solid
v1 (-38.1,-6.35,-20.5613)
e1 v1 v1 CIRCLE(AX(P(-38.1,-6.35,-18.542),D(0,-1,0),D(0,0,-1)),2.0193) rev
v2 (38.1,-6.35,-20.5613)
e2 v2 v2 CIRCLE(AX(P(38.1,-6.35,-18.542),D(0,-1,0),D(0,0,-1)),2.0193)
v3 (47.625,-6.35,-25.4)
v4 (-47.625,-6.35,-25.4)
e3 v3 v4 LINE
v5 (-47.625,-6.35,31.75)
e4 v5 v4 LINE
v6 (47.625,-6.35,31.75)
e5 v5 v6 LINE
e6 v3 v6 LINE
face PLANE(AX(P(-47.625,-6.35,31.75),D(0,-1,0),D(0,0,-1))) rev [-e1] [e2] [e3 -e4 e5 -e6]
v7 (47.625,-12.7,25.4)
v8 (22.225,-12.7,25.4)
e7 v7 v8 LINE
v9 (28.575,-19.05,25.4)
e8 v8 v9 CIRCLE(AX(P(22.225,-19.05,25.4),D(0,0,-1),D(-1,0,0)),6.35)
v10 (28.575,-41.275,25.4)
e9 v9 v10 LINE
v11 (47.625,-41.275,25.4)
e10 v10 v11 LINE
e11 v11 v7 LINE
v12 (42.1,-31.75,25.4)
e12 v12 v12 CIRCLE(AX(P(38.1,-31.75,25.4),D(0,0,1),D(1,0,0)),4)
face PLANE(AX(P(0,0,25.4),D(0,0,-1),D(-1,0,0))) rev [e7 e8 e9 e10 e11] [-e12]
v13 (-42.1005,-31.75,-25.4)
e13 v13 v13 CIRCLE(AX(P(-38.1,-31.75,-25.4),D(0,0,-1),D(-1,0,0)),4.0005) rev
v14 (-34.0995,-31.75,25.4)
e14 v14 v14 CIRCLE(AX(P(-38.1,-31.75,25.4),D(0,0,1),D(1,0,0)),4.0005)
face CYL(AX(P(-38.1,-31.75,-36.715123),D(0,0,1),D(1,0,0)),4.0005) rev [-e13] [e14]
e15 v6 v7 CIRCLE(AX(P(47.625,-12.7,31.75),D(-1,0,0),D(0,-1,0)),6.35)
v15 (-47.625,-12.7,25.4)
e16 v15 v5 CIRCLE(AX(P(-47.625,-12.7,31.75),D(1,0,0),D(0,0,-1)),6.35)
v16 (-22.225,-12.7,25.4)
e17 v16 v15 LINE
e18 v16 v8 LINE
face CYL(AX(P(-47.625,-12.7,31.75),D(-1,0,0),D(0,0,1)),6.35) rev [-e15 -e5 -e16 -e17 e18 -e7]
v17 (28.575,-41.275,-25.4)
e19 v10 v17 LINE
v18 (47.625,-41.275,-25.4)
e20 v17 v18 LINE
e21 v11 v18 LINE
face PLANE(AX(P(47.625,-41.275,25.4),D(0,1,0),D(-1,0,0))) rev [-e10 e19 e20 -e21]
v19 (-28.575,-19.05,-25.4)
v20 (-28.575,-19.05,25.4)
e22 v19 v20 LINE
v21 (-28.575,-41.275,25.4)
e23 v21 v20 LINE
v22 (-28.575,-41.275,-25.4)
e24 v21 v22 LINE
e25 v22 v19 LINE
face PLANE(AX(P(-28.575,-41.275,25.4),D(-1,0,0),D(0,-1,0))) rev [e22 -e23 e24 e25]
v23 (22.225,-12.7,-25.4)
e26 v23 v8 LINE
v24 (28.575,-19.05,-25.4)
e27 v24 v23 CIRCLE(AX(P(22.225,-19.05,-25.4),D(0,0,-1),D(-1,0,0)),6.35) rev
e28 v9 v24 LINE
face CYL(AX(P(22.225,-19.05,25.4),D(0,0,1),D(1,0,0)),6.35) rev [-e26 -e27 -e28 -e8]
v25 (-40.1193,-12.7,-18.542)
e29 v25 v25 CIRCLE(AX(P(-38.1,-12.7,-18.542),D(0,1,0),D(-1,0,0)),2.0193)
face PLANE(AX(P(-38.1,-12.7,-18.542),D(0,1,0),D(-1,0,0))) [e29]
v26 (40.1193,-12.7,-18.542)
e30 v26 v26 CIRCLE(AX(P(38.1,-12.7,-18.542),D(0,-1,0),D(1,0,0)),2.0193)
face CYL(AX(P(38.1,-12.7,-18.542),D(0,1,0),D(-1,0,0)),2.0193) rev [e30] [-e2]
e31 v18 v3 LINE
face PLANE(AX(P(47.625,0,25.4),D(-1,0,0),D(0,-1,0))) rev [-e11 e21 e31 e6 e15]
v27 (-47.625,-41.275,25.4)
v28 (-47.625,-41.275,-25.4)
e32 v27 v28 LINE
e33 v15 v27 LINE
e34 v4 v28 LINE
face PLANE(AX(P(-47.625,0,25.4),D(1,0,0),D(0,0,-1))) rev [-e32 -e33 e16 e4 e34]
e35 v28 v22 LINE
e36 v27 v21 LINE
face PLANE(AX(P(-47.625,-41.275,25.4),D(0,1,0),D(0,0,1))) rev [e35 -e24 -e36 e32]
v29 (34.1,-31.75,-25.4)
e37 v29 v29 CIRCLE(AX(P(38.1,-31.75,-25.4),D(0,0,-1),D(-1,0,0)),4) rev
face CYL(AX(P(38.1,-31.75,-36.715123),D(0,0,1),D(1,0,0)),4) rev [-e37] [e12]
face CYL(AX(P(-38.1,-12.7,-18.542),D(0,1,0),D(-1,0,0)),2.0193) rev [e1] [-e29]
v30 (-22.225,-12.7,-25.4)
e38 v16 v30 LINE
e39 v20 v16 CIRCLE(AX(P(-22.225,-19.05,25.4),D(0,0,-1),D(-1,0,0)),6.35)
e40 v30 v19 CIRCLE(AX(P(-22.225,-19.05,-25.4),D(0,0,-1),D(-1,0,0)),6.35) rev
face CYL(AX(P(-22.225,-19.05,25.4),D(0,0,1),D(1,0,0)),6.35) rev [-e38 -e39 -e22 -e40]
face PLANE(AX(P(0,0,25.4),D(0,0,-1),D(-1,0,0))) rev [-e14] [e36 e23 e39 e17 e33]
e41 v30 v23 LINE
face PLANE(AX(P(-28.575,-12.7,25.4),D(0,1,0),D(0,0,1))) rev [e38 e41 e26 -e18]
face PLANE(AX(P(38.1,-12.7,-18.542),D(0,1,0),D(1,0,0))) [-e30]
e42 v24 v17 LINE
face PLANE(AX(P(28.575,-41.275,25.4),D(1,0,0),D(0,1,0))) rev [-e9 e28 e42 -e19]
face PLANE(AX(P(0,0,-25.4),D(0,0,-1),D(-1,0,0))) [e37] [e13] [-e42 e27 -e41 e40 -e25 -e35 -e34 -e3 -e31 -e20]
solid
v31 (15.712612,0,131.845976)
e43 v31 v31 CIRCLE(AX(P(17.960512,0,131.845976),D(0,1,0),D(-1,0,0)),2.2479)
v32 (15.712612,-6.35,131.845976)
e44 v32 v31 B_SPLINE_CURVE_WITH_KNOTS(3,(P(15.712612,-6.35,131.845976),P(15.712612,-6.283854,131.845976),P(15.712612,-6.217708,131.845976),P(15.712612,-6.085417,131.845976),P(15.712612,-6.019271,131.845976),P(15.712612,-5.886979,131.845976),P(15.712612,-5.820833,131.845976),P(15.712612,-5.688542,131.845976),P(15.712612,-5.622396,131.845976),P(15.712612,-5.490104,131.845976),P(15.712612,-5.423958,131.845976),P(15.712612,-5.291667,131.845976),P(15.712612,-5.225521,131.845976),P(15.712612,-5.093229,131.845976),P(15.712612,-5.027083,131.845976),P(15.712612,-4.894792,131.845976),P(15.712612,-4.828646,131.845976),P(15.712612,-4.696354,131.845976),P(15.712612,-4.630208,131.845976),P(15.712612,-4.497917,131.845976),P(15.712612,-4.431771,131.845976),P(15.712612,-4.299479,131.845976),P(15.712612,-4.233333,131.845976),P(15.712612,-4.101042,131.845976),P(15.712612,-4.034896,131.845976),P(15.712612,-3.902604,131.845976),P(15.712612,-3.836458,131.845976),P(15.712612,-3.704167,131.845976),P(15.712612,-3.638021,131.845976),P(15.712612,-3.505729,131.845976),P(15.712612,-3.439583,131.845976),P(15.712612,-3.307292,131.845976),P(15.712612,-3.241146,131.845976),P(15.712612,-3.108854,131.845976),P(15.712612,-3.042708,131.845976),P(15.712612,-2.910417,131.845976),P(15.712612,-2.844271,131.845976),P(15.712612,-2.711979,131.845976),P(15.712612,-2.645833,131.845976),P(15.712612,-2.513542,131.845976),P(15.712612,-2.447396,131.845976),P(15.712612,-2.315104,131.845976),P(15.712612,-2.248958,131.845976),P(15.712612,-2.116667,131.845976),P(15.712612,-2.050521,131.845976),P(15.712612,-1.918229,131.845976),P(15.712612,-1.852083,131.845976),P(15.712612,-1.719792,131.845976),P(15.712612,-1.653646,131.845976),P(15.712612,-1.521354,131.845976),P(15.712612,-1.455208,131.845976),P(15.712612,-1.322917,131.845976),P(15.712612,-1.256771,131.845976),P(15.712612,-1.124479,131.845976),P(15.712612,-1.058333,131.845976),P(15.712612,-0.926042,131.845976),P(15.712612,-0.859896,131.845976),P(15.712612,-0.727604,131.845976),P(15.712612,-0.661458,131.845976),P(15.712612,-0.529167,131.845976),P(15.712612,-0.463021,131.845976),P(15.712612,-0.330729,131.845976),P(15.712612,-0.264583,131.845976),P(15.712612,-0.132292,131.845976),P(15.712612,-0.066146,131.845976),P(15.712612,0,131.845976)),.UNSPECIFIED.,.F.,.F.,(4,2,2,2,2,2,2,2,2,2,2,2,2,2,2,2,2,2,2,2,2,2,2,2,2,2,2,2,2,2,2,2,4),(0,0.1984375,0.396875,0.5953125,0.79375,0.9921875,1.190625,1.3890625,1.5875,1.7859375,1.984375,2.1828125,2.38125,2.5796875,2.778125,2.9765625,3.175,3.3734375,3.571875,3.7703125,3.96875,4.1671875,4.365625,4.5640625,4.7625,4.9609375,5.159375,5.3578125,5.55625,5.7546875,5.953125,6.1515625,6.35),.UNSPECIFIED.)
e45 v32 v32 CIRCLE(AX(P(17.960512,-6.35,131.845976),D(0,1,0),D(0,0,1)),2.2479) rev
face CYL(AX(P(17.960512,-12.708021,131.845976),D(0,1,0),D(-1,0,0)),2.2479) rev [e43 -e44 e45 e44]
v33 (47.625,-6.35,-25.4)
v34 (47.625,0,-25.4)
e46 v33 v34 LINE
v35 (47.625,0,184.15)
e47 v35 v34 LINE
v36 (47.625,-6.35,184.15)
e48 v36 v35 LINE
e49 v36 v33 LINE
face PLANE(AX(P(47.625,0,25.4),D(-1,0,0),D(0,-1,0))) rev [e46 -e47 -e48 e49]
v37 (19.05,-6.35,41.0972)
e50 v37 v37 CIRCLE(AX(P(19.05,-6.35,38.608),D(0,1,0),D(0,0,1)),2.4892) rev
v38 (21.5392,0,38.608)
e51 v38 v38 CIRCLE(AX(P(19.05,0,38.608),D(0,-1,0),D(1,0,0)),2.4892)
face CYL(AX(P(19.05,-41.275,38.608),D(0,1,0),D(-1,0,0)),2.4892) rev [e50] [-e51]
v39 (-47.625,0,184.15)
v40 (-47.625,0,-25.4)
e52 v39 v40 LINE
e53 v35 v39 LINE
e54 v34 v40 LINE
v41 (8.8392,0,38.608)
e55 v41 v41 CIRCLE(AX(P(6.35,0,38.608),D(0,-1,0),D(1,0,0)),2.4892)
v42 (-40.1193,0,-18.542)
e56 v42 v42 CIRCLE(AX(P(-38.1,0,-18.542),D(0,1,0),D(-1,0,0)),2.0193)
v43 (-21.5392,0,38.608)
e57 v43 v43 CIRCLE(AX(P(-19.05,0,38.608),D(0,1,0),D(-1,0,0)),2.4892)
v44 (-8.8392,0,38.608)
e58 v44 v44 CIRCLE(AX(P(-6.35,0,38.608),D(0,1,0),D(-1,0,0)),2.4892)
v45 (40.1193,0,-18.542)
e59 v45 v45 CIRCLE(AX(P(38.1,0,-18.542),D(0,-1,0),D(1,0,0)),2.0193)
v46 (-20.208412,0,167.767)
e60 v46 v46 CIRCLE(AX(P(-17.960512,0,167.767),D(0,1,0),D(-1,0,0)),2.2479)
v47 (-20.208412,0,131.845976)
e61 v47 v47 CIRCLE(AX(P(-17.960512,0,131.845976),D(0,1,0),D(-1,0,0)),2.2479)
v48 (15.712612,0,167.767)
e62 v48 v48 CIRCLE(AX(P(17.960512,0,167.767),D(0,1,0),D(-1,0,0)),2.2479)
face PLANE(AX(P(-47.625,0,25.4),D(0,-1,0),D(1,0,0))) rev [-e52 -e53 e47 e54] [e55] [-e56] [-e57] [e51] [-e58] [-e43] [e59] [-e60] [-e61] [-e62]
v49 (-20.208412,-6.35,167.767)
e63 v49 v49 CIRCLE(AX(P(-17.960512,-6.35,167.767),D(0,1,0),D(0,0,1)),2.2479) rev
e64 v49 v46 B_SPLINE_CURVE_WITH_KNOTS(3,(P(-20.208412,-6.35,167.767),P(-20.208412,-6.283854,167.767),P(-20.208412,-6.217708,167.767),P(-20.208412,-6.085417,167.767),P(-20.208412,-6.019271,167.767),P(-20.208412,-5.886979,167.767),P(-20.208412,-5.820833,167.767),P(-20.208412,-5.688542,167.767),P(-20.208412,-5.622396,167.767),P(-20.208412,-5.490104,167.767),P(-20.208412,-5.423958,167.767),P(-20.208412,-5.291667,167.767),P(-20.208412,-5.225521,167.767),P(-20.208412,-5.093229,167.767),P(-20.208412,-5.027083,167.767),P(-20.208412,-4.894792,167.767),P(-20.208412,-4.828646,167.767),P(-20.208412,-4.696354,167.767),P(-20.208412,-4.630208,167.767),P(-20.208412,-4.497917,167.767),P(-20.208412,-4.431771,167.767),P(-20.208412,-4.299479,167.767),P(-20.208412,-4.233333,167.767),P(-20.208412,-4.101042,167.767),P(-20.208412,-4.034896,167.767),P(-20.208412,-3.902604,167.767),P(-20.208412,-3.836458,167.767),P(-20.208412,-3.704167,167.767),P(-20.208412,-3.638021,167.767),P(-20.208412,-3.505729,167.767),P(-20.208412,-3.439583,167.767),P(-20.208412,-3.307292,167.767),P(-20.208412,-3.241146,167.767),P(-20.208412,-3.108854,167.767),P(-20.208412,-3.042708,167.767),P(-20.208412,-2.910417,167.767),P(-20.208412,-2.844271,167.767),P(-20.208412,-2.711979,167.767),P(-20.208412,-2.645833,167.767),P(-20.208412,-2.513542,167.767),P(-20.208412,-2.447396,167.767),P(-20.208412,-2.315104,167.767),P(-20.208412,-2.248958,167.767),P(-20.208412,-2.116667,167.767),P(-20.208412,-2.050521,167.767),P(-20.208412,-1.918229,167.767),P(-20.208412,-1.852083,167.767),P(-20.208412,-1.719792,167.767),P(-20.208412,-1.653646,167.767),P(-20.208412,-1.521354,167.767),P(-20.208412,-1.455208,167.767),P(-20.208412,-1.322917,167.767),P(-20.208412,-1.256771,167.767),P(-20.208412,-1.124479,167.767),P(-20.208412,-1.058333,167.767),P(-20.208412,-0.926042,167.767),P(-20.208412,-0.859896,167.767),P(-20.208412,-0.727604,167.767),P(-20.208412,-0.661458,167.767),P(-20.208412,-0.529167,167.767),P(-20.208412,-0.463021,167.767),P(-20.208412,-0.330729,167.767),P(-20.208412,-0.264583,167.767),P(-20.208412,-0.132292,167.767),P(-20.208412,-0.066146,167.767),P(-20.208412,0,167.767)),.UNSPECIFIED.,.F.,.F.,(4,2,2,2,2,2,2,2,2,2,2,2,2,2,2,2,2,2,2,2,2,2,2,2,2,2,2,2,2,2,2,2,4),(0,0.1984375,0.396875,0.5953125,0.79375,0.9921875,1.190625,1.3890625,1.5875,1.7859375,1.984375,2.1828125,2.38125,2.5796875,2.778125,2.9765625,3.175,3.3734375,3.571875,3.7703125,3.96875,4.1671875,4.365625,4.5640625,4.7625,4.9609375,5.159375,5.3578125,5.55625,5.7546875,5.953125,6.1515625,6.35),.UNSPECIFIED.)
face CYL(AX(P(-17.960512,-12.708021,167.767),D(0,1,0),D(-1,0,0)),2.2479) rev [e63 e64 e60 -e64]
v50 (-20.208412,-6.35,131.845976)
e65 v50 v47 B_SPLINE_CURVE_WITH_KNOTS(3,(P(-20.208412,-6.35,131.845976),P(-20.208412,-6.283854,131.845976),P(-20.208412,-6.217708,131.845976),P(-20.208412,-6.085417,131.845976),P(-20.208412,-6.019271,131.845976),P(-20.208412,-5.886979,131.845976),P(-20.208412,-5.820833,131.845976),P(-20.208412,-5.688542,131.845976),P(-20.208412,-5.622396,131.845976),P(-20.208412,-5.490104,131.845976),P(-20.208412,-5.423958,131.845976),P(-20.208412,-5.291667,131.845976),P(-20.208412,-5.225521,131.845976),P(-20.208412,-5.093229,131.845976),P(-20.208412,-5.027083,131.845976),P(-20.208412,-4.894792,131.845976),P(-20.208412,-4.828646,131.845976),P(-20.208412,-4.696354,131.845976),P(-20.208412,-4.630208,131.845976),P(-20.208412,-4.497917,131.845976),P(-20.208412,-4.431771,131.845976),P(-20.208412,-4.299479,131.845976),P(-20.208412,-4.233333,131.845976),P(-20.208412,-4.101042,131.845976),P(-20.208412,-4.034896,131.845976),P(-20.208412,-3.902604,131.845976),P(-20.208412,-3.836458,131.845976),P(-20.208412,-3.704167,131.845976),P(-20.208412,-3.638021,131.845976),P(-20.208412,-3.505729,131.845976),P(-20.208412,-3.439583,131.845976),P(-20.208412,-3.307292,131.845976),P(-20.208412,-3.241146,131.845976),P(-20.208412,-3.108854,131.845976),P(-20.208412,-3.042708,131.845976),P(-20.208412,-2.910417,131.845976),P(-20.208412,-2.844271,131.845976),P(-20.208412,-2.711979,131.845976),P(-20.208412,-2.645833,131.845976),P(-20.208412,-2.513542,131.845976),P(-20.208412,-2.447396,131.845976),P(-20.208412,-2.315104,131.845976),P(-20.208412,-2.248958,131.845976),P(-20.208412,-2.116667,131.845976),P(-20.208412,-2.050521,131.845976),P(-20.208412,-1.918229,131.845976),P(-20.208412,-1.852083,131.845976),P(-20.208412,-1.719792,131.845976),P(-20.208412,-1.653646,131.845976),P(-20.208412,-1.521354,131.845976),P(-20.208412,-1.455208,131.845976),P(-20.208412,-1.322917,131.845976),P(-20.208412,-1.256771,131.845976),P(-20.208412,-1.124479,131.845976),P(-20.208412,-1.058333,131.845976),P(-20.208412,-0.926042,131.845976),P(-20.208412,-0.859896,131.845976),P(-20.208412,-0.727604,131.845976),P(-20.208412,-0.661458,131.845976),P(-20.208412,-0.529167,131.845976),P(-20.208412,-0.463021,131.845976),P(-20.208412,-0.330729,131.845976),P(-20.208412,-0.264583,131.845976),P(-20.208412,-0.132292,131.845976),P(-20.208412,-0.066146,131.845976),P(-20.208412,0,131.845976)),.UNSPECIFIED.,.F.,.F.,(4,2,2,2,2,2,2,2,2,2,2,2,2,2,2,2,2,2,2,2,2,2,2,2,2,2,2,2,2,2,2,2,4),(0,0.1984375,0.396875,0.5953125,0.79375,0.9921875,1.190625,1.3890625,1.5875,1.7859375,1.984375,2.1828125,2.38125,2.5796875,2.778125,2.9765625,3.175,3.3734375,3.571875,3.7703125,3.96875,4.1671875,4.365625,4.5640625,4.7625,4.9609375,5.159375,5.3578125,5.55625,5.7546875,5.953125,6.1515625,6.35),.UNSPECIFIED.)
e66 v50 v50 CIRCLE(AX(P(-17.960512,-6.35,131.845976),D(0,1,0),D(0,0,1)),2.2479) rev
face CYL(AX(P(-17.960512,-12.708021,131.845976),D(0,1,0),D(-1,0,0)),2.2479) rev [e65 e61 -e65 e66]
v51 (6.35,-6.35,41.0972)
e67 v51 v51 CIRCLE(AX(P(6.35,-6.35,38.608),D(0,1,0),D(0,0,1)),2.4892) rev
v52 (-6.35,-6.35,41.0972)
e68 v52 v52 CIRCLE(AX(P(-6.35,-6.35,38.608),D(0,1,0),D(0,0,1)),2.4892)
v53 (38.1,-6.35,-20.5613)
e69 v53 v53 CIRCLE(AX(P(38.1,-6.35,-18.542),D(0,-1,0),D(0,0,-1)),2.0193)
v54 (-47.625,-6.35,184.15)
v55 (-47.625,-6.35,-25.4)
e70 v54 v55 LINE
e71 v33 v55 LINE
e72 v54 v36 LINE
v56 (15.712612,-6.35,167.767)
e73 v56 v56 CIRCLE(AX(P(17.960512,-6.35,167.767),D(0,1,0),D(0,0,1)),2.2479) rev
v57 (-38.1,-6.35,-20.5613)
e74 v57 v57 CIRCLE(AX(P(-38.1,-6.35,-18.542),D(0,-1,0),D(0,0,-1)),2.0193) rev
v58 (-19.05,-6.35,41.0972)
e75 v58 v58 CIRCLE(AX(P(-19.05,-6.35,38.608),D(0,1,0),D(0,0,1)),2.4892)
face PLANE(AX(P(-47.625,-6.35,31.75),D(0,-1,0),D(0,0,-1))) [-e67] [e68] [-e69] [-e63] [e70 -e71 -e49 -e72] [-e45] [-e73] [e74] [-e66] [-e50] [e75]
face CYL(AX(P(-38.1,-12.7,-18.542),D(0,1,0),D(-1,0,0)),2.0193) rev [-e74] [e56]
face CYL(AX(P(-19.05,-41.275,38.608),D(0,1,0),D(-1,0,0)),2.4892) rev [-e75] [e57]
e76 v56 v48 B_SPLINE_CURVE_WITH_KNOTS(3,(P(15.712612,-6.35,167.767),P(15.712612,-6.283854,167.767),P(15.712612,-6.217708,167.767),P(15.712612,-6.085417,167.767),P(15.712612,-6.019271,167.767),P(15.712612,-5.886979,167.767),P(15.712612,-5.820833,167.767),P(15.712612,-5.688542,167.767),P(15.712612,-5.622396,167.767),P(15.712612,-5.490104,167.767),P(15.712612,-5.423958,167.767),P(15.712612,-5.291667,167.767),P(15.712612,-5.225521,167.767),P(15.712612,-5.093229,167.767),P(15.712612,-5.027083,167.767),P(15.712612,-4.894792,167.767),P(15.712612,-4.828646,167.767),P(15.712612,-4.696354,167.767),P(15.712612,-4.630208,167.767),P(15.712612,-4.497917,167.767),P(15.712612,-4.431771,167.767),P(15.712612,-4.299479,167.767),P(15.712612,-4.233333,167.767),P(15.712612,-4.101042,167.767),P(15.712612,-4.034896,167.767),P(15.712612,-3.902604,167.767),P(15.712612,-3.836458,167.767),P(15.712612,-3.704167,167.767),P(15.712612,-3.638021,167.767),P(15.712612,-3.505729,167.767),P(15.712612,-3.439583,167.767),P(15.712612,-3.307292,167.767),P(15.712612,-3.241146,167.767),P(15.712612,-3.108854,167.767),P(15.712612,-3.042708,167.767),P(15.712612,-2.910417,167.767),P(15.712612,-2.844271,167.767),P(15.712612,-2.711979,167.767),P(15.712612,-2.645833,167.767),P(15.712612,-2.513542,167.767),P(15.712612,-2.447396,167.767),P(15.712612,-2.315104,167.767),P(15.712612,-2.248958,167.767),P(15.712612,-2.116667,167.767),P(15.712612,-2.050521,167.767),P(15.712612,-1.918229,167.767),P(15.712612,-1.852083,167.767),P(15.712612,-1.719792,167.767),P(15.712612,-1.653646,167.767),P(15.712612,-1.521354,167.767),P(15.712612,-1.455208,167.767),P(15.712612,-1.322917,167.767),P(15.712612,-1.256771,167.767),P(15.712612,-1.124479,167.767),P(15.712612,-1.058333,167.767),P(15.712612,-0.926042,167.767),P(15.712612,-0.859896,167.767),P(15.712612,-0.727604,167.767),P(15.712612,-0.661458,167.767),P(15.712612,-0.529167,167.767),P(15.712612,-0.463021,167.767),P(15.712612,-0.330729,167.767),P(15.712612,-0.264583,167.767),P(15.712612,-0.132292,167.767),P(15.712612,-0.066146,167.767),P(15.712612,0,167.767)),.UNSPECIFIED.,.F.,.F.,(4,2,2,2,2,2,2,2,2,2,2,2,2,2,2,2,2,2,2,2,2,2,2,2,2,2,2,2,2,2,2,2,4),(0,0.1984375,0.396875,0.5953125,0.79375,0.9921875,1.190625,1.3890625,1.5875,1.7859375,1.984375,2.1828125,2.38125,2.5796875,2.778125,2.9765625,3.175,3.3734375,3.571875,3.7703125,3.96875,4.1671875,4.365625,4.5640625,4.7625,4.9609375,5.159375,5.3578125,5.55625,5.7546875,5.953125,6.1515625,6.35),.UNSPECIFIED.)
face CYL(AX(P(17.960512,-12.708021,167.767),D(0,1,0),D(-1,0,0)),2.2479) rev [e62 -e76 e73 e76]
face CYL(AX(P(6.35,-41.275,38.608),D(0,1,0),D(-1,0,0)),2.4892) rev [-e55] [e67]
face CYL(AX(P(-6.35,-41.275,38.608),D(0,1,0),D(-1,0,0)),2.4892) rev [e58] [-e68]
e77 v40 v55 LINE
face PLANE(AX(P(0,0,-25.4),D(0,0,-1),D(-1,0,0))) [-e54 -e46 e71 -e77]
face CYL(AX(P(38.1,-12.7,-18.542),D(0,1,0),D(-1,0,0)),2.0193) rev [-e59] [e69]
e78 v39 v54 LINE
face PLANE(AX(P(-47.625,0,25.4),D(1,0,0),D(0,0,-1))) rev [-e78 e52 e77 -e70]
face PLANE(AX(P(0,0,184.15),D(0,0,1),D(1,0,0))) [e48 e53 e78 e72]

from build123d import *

# Parameters (mm, degrees)
BOSS_EXTRUDE1_DEPTH = 25.4
FILLET1_R           = 6.35
SKETCH2_R           = 4.0005
SKETCH2_R_2         = 4
CUT_EXTRUDE1_DEPTH  = 50.8
SKETCH4_W           = 95.25
SKETCH4_H           = 6.35
BOSS_EXTRUDE3_DEPTH = 158.75
SKETCH5_R           = 2.0193
CUT_EXTRUDE2_DEPTH  = 12.7
FILLET2_R           = 6.35
SKETCH6_R           = 2.2479
CUT_EXTRUDE3_DEPTH  = 6.35
SKETCH10_R          = 2.4892
CUT_EXTRUDE4_DEPTH  = 195.635527975


# Read off the part's stored shape, not the designer's step: Split1
with BuildPart() as part:
    # Sketch1 → Boss-Extrude1 (new, symmetric)
    with BuildSketch(Plane.XY):
        Polygon((-47.625, 0), (47.625, 0), (47.625, -41.275), (28.575, -41.275), (28.575, -12.7), (-28.575, -12.7), (-28.575, -41.275), (-47.625, -41.275), align=None)
    extrude(amount=BOSS_EXTRUDE1_DEPTH, both=True)

    # Fillet1
    fillet1_edges = [part.edges().sort_by_distance(p)[0] for p in [
        (28.575, -12.7, 0),
        (-28.575, -12.7, 0),
    ]]
    fillet(fillet1_edges, radius=FILLET1_R)

    # Sketch2 → Cut-Extrude1 (cut)
    with BuildSketch(Plane.XY.offset(25.4)):
        with Locations((-38.1, -31.75)):
            Circle(SKETCH2_R)
        with Locations((38.1, -31.75)):
            Circle(SKETCH2_R_2)
    extrude(amount=-CUT_EXTRUDE1_DEPTH, mode=Mode.SUBTRACT)

    # Sketch4 → Boss-Extrude3 (add)
    with BuildSketch(Plane.XY.offset(25.4)):
        with Locations((0, -3.175)):
            Rectangle(SKETCH4_W, SKETCH4_H)
    extrude(amount=BOSS_EXTRUDE3_DEPTH)

    # Sketch5 → Cut-Extrude2 (cut)
    with BuildSketch(Plane(origin=(0, 0, 0), x_dir=(1, 0, 0), z_dir=(0, 1, 0))):
        with Locations(Location((-38.1, 18.542, 0), (0, 0, 180))):
            Circle(SKETCH5_R)
    cut_extrude2 = extrude(amount=-CUT_EXTRUDE2_DEPTH, mode=Mode.SUBTRACT)

    # Mirror1: Cut-Extrude2 across plane
    add(cut_extrude2.mirror(Plane(origin=(0, 0, 0), x_dir=(0, 0, 1), z_dir=(1, 0, 0))), mode=Mode.SUBTRACT)

    # Fillet2
    fillet2_edges = [part.edges().sort_by_distance(p)[0] for p in [
        (0, -6.35, 25.4),
    ]]
    fillet(fillet2_edges, radius=FILLET2_R - 0.0001)  # a hair under: the kernel refuses the full size

    # Sketch6 → Cut-Extrude3 (cut)
    with BuildSketch(Plane(origin=(0, 0, 0), x_dir=(1, 0, 0), z_dir=(0, 1, 0))):
        with Locations(Location((-17.960512242, -167.767, 0), (0, 0, 180))):
            Circle(SKETCH6_R)
        with Locations(Location((-17.960512242, -131.845975516, 0), (0, 0, 180))):
            Circle(SKETCH6_R)
        with Locations(Location((17.960512242, -167.767, 0), (0, 0, 180))):
            Circle(SKETCH6_R)
        with Locations(Location((17.960512242, -131.845975516, 0), (0, 0, 180))):
            Circle(SKETCH6_R)
    extrude(amount=-CUT_EXTRUDE3_DEPTH, mode=Mode.SUBTRACT)

    # Sketch10 → Cut-Extrude4 (cut, through all)
    with BuildSketch(Plane(origin=(0, 0, 0), x_dir=(1, 0, 0), z_dir=(0, 1, 0))):
        with Locations(Location((-6.35, -38.608, 0), (0, 0, 180))):
            Circle(SKETCH10_R)
        with Locations(Location((-19.05, -38.608, 0), (0, 0, 180))):
            Circle(SKETCH10_R)
    cut_extrude4 = extrude(amount=-CUT_EXTRUDE4_DEPTH, mode=Mode.SUBTRACT)

    # Mirror2: Cut-Extrude4 across plane
    add(cut_extrude4.mirror(Plane(origin=(0, 0, 0), x_dir=(0, 0, 1), z_dir=(1, 0, 0))), mode=Mode.SUBTRACT)


with BuildPart() as body_2:
    # Split1: the piece on the far side of the plane
    add(part.part)
    split(bisect_by=Plane(origin=(0, -6.35, 0), x_dir=(1, 0, 0), z_dir=(0, 1, 0)), keep=Keep.BOTTOM)


with BuildPart() as part_1:
    add(part.part)

    # Split1
    split(bisect_by=Plane(origin=(0, -6.35, 0), x_dir=(1, 0, 0), z_dir=(0, 1, 0)), keep=Keep.TOP)


solid = Compound([body_2.part, part_1.part])
